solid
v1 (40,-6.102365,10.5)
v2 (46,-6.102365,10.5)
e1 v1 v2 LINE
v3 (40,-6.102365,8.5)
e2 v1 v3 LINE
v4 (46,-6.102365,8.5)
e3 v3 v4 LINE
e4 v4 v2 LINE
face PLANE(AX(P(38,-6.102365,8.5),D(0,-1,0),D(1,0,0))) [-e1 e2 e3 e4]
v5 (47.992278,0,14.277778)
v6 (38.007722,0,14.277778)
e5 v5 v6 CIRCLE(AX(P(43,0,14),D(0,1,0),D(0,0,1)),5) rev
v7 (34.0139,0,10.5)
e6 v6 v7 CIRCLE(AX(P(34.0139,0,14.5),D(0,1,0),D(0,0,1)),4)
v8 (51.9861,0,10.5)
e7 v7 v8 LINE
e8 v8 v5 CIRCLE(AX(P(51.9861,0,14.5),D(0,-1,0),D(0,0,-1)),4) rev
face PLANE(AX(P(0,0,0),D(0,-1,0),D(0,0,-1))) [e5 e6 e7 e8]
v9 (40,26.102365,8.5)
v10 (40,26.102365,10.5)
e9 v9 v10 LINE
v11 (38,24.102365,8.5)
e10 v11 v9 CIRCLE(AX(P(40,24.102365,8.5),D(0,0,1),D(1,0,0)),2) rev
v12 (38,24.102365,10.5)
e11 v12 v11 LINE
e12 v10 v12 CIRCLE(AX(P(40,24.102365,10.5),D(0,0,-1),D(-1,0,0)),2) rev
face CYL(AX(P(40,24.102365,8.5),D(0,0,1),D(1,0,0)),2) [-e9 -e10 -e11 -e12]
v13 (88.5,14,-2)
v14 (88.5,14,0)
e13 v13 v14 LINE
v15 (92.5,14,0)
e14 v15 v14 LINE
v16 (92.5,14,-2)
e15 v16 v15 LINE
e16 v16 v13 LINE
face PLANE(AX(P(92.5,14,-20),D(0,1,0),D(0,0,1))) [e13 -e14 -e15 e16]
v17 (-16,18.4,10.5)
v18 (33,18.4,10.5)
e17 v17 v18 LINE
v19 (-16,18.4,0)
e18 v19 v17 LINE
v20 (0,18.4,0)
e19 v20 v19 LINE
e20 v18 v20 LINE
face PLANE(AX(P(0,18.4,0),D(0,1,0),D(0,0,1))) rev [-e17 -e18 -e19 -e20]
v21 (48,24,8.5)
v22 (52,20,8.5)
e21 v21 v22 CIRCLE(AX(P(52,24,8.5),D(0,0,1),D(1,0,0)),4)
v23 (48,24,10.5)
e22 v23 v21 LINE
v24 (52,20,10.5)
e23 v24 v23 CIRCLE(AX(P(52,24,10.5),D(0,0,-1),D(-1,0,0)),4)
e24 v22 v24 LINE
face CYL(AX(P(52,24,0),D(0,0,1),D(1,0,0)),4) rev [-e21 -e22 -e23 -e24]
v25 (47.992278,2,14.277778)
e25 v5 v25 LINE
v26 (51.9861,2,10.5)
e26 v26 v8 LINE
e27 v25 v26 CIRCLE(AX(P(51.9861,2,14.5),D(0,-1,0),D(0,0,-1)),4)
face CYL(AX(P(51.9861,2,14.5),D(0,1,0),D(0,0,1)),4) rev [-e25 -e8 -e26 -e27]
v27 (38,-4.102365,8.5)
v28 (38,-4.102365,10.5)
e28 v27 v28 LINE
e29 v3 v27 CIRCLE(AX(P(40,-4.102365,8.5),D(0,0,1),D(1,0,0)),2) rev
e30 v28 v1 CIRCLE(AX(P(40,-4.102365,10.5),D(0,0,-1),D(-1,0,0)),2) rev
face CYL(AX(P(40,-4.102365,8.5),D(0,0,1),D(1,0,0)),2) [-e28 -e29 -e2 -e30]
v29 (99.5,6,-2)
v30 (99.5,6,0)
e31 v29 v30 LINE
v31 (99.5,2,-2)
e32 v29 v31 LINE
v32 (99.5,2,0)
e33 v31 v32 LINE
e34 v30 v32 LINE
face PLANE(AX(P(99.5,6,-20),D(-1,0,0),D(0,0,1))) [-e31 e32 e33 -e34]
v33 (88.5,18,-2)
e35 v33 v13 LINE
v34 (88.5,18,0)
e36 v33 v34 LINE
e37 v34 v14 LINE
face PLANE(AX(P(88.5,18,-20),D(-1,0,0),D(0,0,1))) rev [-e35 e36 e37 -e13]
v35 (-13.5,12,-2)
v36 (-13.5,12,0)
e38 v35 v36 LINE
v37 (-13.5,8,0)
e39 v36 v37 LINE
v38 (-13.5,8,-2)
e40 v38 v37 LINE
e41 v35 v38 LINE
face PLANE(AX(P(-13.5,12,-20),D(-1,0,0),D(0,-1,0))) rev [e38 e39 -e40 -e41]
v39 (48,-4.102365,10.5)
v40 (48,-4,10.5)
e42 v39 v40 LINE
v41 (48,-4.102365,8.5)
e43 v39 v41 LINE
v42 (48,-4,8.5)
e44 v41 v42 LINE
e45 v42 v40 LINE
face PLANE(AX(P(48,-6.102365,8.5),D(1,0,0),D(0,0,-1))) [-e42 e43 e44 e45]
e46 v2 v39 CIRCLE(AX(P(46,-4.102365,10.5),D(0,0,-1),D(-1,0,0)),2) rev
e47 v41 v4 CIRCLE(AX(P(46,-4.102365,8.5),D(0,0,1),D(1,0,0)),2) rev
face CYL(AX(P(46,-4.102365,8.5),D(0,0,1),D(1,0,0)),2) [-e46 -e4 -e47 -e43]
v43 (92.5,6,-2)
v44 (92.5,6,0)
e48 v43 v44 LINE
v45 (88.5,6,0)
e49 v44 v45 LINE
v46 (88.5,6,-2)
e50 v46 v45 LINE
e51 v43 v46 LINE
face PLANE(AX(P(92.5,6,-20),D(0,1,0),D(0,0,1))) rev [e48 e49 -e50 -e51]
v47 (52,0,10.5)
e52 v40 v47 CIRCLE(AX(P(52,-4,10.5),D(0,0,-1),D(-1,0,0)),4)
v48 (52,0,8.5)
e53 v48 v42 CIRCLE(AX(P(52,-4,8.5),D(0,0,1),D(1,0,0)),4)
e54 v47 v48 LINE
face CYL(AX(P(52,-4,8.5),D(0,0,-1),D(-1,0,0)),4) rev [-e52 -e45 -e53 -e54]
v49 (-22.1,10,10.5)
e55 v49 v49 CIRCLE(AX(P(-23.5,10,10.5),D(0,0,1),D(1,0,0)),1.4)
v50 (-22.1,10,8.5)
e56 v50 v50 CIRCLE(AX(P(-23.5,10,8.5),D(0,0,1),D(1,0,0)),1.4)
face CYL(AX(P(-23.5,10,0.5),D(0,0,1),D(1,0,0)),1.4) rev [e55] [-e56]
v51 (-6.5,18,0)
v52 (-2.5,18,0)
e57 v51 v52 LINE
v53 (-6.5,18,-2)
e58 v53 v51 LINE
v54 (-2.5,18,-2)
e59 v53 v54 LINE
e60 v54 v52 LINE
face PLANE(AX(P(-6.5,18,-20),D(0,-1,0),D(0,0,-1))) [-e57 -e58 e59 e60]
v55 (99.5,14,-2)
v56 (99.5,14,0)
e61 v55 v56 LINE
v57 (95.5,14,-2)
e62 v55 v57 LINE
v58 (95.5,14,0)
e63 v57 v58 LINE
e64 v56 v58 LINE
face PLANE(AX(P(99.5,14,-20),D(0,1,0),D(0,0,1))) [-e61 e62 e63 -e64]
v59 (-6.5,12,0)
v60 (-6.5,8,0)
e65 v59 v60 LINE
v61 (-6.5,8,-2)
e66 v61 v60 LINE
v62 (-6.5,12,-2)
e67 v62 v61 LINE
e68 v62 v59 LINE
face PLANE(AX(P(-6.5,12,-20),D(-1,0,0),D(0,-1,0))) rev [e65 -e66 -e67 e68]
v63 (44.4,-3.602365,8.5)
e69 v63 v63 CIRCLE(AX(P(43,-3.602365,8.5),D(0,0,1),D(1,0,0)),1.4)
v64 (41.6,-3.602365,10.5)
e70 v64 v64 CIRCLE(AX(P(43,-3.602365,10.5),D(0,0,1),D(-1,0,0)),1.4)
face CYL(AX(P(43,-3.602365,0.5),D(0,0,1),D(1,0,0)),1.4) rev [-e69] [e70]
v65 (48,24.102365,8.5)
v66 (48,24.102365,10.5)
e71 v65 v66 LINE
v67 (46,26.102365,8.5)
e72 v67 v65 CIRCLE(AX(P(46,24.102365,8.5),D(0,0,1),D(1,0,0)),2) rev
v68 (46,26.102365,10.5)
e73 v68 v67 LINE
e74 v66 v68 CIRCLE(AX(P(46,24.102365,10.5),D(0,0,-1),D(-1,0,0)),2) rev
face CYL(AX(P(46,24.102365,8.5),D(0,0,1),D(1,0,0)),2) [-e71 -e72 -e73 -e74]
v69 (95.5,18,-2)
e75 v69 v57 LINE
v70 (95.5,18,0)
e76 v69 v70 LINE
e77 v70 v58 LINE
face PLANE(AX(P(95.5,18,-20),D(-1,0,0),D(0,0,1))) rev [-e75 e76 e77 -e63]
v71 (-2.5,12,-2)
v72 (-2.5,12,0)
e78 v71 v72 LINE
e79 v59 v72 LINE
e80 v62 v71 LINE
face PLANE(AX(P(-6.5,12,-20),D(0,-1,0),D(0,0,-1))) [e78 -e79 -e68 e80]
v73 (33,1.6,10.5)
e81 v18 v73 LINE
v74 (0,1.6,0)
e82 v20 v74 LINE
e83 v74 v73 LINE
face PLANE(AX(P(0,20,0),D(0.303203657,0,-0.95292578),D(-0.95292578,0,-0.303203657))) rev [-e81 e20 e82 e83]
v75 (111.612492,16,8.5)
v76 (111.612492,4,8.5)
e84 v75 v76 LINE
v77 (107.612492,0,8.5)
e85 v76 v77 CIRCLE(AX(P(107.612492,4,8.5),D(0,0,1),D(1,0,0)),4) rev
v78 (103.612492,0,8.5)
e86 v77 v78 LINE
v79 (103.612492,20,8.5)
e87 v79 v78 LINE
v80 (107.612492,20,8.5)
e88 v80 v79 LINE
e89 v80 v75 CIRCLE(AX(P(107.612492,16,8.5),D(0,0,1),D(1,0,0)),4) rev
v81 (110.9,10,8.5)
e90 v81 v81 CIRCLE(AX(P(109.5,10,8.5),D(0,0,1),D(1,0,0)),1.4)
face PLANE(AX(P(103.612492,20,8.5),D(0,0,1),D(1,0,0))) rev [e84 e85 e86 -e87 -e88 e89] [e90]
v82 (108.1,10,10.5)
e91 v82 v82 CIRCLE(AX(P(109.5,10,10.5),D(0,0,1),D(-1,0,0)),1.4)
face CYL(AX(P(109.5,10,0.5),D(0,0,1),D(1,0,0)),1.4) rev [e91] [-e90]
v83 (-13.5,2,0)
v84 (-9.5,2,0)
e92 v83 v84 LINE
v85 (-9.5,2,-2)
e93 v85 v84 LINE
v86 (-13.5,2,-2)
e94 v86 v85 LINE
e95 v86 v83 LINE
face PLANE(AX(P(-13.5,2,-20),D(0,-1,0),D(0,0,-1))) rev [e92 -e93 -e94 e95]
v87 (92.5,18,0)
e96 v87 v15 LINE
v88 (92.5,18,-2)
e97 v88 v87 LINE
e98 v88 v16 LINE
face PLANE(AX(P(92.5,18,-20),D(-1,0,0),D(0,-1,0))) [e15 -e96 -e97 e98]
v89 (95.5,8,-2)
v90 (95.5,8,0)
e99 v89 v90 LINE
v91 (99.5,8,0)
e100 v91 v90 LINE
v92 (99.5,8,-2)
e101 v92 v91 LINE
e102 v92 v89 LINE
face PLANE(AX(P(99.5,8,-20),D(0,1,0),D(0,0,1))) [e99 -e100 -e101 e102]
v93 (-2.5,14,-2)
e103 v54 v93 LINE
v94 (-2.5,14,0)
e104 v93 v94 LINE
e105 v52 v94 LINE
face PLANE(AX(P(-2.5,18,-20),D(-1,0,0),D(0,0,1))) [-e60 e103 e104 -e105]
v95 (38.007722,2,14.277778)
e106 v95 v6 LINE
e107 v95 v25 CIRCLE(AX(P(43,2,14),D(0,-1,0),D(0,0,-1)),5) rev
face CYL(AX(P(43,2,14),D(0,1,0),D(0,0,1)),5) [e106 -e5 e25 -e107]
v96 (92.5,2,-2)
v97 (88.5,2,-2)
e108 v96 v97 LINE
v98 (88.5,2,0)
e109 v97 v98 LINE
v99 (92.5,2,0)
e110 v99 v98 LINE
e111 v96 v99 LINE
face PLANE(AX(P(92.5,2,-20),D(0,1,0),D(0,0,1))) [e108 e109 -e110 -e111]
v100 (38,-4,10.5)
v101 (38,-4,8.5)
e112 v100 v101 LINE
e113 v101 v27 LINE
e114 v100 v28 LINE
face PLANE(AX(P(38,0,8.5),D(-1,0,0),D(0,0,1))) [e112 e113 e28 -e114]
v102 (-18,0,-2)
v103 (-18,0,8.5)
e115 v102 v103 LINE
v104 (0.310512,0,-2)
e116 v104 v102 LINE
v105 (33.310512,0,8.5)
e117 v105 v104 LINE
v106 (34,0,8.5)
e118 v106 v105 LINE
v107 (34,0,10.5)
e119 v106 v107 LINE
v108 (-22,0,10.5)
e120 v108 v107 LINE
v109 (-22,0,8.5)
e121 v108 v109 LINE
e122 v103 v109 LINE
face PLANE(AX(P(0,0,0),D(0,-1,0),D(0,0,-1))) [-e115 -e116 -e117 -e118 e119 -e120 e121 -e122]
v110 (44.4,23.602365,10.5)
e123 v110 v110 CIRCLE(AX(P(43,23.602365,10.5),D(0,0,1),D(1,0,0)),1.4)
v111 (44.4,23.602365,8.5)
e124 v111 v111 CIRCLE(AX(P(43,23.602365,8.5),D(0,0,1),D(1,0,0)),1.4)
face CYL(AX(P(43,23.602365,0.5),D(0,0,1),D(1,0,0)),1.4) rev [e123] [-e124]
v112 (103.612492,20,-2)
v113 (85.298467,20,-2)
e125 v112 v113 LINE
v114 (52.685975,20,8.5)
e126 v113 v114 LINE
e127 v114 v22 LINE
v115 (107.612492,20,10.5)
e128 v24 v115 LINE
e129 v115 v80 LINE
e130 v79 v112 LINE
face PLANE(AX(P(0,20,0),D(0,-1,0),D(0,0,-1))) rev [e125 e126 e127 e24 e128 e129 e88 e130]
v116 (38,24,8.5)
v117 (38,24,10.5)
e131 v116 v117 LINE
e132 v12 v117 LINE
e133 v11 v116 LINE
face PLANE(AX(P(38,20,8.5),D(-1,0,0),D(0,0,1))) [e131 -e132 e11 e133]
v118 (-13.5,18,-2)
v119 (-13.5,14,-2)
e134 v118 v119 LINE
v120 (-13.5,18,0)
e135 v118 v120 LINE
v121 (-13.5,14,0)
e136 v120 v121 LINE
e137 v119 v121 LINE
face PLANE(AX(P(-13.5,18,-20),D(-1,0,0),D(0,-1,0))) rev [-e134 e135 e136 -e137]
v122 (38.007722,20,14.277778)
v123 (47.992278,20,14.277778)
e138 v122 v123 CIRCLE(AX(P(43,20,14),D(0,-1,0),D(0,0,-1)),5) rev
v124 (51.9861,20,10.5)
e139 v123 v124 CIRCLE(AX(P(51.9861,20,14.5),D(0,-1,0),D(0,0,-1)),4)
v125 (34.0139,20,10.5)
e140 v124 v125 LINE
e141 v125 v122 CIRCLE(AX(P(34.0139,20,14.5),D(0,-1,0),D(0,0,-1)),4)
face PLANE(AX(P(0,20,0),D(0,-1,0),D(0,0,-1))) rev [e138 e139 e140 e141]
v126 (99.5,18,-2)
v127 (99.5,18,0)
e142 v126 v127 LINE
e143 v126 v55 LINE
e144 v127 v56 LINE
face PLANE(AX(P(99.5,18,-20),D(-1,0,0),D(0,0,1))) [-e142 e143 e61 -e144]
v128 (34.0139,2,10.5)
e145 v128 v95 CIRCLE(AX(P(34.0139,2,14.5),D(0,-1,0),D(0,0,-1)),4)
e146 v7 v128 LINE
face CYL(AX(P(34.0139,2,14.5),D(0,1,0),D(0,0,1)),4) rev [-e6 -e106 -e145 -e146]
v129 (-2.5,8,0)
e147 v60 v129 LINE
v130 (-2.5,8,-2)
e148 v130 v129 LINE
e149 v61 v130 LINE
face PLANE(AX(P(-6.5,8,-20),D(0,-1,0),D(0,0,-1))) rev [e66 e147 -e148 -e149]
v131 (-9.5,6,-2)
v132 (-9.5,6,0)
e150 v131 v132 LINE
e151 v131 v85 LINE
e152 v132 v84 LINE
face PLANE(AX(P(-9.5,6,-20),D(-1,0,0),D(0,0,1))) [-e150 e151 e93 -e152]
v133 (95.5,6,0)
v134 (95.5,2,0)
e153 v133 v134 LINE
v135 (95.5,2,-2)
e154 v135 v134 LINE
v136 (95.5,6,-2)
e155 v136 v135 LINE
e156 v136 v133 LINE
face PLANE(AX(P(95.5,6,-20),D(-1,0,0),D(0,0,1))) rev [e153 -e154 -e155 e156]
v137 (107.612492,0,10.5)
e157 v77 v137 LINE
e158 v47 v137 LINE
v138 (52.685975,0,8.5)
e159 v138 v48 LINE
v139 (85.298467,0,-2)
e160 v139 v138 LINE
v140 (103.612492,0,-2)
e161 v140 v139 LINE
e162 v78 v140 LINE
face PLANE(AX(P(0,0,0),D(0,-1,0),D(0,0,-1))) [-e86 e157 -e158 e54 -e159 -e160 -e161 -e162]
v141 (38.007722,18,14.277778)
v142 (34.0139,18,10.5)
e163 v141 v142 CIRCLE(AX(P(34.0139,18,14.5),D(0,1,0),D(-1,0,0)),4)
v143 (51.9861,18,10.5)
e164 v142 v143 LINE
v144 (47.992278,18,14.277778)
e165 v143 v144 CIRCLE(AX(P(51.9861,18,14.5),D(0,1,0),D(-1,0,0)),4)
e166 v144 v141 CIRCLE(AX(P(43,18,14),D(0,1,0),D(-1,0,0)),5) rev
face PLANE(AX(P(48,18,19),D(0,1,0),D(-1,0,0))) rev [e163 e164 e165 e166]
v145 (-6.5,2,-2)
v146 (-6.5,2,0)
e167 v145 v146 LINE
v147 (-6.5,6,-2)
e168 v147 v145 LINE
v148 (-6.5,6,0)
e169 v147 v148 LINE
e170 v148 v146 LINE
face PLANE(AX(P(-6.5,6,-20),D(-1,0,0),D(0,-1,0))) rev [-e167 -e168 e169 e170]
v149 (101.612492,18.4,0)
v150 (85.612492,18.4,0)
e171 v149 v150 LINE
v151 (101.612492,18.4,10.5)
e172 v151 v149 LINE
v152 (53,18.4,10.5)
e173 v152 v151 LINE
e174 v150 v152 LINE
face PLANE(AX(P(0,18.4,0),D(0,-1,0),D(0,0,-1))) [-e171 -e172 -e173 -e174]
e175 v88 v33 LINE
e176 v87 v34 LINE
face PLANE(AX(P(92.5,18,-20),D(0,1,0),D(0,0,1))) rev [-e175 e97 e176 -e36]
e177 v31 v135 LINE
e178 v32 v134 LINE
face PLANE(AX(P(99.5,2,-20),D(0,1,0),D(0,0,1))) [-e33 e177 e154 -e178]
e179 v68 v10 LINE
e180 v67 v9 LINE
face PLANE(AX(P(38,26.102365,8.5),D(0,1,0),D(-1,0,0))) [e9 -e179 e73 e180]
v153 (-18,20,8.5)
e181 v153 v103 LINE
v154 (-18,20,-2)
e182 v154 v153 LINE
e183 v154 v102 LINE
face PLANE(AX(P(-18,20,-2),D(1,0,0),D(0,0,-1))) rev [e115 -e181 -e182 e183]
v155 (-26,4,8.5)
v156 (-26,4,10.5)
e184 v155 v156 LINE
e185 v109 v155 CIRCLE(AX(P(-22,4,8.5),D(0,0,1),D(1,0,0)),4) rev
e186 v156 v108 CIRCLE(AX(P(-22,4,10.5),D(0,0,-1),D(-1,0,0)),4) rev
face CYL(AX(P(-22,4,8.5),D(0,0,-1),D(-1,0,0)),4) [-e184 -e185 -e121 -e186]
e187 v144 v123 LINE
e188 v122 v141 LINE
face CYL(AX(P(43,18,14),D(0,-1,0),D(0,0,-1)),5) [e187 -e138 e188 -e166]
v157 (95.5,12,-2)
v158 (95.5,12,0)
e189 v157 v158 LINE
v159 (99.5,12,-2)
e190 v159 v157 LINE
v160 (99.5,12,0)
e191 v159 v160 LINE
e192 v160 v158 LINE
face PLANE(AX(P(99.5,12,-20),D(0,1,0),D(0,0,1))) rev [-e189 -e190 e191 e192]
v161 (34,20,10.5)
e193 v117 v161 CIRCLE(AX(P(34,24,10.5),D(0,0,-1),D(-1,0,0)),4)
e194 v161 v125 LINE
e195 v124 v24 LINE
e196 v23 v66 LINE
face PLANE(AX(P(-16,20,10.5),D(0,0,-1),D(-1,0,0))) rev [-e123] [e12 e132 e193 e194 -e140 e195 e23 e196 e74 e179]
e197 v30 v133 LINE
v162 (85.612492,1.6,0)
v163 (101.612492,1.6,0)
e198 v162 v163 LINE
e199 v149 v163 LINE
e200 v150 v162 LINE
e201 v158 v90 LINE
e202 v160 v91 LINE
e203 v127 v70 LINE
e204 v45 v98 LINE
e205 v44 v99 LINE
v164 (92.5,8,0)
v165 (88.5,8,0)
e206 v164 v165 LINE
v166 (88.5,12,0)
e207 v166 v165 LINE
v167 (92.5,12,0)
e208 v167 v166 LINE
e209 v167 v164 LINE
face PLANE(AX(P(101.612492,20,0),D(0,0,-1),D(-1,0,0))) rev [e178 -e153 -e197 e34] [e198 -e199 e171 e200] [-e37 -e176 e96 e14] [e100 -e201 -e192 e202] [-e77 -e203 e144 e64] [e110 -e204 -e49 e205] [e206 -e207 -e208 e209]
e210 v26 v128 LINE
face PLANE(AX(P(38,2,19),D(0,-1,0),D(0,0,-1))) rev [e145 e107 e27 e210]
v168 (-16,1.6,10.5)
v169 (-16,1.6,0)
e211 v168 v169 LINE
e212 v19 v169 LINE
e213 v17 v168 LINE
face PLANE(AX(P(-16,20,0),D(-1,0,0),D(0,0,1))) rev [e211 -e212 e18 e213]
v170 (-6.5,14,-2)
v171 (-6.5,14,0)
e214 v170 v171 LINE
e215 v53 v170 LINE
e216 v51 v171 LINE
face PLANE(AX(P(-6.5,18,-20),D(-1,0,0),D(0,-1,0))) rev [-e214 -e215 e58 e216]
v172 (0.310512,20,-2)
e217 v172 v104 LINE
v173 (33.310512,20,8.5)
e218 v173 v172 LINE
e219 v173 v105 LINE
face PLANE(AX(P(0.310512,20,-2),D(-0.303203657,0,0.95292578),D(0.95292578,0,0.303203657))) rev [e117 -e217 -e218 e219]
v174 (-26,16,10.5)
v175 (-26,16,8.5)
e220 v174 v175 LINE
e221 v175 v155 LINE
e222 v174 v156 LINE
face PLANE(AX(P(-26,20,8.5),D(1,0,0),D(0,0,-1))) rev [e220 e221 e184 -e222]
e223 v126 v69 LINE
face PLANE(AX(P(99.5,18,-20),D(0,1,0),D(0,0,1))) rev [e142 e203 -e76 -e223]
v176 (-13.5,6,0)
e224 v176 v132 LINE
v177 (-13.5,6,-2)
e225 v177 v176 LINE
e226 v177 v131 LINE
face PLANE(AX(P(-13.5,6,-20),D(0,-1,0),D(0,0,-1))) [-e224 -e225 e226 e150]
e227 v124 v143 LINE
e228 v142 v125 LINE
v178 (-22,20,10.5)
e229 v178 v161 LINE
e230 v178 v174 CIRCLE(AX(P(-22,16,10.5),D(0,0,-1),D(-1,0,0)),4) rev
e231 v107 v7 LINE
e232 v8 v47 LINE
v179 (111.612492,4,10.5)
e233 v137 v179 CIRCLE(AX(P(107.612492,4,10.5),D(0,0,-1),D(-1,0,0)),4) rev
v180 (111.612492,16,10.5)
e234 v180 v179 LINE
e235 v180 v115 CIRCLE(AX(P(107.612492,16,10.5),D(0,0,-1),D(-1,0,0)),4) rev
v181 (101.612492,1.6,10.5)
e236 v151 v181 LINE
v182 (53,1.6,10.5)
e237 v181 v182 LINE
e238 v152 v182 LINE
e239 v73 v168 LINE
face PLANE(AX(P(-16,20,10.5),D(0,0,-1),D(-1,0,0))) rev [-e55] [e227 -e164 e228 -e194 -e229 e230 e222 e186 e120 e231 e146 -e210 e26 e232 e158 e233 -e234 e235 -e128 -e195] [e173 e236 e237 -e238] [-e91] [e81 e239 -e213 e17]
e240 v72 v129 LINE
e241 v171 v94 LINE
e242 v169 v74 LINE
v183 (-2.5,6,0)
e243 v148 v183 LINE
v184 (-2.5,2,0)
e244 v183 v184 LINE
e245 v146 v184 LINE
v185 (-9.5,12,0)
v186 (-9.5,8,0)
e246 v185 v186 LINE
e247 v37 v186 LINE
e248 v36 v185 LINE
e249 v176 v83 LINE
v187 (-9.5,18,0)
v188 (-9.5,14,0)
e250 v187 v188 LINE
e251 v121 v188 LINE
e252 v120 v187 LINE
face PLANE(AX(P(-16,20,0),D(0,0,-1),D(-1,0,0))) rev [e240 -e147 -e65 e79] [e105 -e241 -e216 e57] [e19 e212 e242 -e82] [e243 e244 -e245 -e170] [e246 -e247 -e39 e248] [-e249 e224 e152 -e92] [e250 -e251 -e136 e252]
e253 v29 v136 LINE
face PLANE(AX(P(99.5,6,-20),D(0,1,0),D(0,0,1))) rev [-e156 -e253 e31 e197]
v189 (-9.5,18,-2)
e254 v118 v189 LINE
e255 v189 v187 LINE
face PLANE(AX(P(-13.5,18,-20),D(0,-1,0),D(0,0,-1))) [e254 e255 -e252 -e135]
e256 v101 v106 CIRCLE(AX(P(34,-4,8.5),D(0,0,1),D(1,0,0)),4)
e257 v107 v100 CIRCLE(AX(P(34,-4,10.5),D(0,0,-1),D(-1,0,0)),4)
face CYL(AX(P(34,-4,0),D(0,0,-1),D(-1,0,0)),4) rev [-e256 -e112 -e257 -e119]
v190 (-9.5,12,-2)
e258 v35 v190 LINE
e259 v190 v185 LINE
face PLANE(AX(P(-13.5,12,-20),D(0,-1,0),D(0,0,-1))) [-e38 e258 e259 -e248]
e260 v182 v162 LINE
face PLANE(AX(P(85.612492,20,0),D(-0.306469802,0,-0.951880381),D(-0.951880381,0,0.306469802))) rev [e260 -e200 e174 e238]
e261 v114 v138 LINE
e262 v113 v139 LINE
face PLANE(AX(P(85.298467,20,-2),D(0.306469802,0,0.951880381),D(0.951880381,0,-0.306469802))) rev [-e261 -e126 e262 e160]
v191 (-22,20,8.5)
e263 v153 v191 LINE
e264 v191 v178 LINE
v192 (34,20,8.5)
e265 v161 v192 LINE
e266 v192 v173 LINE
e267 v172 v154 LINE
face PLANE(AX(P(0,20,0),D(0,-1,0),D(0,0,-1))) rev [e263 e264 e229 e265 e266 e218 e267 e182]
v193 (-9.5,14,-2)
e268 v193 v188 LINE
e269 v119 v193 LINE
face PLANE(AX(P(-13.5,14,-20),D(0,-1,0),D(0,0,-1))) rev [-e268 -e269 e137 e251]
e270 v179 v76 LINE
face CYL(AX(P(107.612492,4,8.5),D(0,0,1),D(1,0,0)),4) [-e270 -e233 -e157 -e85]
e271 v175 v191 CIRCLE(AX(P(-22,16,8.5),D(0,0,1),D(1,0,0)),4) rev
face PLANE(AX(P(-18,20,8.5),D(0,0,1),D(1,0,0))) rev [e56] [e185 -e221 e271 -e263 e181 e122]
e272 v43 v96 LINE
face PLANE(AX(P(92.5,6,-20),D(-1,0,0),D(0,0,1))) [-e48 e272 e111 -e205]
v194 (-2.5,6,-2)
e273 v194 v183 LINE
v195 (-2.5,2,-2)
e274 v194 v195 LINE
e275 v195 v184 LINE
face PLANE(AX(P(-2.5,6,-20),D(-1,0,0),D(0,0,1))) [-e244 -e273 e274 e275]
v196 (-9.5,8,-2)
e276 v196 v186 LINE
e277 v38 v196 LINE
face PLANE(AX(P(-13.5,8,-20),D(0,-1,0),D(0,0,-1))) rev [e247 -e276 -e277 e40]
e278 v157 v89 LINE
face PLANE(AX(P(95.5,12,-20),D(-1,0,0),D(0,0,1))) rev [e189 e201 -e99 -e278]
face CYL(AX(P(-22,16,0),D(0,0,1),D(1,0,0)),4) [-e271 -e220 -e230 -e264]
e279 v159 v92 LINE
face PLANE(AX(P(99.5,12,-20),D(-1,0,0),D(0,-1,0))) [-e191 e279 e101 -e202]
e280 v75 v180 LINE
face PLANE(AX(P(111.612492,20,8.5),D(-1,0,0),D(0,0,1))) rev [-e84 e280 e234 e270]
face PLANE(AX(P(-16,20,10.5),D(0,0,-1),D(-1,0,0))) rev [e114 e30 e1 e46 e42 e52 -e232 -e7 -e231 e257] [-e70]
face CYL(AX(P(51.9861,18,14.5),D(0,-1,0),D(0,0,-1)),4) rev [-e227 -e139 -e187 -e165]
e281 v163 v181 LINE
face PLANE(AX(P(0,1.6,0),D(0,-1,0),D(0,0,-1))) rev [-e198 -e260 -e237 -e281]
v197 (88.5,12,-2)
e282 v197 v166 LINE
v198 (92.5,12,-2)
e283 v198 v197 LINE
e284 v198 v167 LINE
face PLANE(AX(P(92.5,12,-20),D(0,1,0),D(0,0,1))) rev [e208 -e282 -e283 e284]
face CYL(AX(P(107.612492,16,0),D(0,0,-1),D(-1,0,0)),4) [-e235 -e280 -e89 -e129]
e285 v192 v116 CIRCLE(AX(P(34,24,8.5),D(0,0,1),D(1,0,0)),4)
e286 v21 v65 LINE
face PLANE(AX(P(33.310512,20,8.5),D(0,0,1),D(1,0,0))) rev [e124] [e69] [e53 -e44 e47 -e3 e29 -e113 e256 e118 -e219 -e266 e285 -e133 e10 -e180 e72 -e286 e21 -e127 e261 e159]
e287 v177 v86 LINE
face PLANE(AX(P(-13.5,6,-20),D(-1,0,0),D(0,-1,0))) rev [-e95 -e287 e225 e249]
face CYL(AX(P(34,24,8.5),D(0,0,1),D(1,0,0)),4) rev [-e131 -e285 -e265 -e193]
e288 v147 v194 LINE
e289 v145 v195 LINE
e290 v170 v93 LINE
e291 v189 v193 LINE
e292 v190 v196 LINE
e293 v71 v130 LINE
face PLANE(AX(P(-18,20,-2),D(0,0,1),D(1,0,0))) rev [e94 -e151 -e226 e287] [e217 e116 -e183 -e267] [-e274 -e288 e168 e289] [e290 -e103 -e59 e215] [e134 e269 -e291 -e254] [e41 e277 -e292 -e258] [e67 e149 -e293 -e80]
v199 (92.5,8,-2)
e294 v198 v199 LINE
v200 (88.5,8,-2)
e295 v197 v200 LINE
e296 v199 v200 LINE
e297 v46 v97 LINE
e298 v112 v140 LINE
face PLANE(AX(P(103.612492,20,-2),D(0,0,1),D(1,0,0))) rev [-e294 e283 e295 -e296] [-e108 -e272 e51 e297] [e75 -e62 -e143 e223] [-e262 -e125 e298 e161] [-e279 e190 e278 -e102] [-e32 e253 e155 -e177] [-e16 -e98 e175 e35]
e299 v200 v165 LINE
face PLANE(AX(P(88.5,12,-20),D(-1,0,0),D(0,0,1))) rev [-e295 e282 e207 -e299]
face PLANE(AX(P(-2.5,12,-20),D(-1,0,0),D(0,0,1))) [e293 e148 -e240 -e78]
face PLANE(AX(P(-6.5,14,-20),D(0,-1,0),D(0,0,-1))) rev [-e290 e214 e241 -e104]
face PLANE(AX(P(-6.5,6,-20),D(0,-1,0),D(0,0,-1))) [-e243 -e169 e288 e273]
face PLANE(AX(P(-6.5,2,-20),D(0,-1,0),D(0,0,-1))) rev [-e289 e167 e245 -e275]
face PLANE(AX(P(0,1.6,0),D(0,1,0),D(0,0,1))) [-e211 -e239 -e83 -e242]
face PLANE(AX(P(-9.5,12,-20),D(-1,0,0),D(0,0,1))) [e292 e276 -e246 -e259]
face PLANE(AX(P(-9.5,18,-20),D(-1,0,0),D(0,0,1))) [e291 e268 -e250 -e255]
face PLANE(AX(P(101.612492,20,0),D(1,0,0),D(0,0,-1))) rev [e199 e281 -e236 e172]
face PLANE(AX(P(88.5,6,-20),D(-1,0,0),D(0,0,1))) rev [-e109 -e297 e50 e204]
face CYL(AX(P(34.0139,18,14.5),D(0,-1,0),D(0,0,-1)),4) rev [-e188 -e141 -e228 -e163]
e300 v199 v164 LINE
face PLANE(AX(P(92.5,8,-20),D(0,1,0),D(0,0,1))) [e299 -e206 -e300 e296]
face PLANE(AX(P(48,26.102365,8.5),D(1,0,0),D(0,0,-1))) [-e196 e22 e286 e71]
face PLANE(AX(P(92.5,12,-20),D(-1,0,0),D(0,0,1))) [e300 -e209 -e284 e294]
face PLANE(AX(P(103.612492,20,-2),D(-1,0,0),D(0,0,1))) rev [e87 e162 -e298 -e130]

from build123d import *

# Parameters (mm, degrees)
ESTRUSIONE_ESTRUSIONE1_DEPTH = 20
SCHIZZO2_W                   = 4
SCHIZZO2_H                   = 4
TAGLIO_ESTRUSIONE2_DEPTH     = 20
SCHIZZO3_W                   = 10
SCHIZZO3_H                   = 6.102364877
ESTRUSIONE_ESTRUSIONE3_DEPTH = 2
ESTRUSIONE_ESTRUSIONE4_DEPTH = 1.6
ESTRUSIONE_ESTRUSIONE5_DEPTH = 1.6
SCHIZZO15_W                  = 10
SCHIZZO15_H                  = 2
ESTRUSIONE_ESTRUSIONE6_DEPTH = 8.5
ESTRUSIONE_ESTRUSIONE7_DEPTH = 1.6
ESTRUSIONE_ESTRUSIONE8_DEPTH = 1.6
SCHIZZO24_W                  = 10
SCHIZZO24_H                  = 2
ESTRUSIONE_ESTRUSIONE9_DEPTH = 8.5
RACCORDO1_RADIUS             = 5
RACCORDO1_LENGTH             = 2
RACCORDO2_RADIUS             = 5
RACCORDO2_LENGTH             = 2
RACCORDO3_R                  = 4
RACCORDO4_R                  = 4
RACCORDO6_R                  = 2
SCHIZZO28_R                  = 1.4
TAGLIO_ESTRUSIONE5_DEPTH     = 10
SCHIZZO29_R                  = 1.4
TAGLIO_ESTRUSIONE6_DEPTH     = 10


with BuildPart() as part:
    # Schizzo1 → Estrusione-Estrusione1 (new body)
    with BuildSketch(Plane(origin=(0, 0, 0), x_dir=(1, 0, 0), z_dir=(0, 1, 0))):
        Polygon((-16, 0), (0, 0), (33, -10.5), (53, -10.5), (85.612492158, 0), (101.612492158, 0), (101.612492158, -10.5), (111.612492158, -10.5), (111.612492158, -8.5), (103.612492158, -8.5), (103.612492158, 2), (85.29846697, 2), (52.685974812, -8.5), (33.310512217, -8.5), (0.310512217, 2), (-18, 2), (-18, -8.5), (-26, -8.5), (-26, -10.5), (-16, -10.5), align=None)
    extrude(amount=ESTRUSIONE_ESTRUSIONE1_DEPTH)

    # Schizzo2 → Taglio-Estrusione2 (cut)
    with BuildSketch(Plane.XY):
        with Locations((-11.5, 16)):
            Rectangle(SCHIZZO2_W, SCHIZZO2_H)
        with Locations((-4.5, 16)):
            Rectangle(SCHIZZO2_W, SCHIZZO2_H)
        with Locations((-4.5, 10)):
            Rectangle(SCHIZZO2_W, SCHIZZO2_H)
        with Locations((-4.5, 4)):
            Rectangle(SCHIZZO2_W, SCHIZZO2_H)
        with Locations((-11.5, 10)):
            Rectangle(SCHIZZO2_W, SCHIZZO2_H)
        with Locations((-11.5, 4)):
            Rectangle(SCHIZZO2_W, SCHIZZO2_H)
        with Locations((97.5, 4)):
            Rectangle(SCHIZZO2_W, SCHIZZO2_H)
        with Locations((90.5, 4)):
            Rectangle(SCHIZZO2_W, SCHIZZO2_H)
        with Locations((90.5, 10)):
            Rectangle(SCHIZZO2_W, SCHIZZO2_H)
        with Locations((97.5, 10)):
            Rectangle(SCHIZZO2_W, SCHIZZO2_H)
        with Locations((90.5, 16)):
            Rectangle(SCHIZZO2_W, SCHIZZO2_H)
        with Locations((97.5, 16)):
            Rectangle(SCHIZZO2_W, SCHIZZO2_H)
    extrude(amount=-TAGLIO_ESTRUSIONE2_DEPTH, mode=Mode.SUBTRACT)

    # Schizzo3 → Estrusione-Estrusione3 (add)
    with BuildSketch(Plane.XY.offset(10.5)):
        with Locations((43, 23.051182438)):
            Rectangle(SCHIZZO3_W, SCHIZZO3_H)
        with Locations((43, -3.051182439)):
            Rectangle(SCHIZZO3_W, SCHIZZO3_H)
    extrude(amount=-ESTRUSIONE_ESTRUSIONE3_DEPTH)

    # Schizzo4 → Estrusione-Estrusione4 (add)
    with BuildSketch(Plane.XZ):
        Polygon((-16, 0), (-16, 10.5), (33, 10.5), (0, 0), align=None)
    extrude(amount=-ESTRUSIONE_ESTRUSIONE4_DEPTH)

    # Schizzo6 → Estrusione-Estrusione5 (add)
    with BuildSketch(Plane.XZ):
        Polygon((101.612492158, 10.5), (53, 10.5), (85.612492158, 0), (101.612492158, 0), align=None)
    extrude(amount=-ESTRUSIONE_ESTRUSIONE5_DEPTH)

    # Schizzo15 → Estrusione-Estrusione6 (add)
    with BuildSketch(Plane.XY.offset(10.5)):
        with Locations((43, 1)):
            Rectangle(SCHIZZO15_W, SCHIZZO15_H)
    extrude(amount=ESTRUSIONE_ESTRUSIONE6_DEPTH)

    # Schizzo20 → Estrusione-Estrusione7 (add)
    with BuildSketch(Plane(origin=(0, 20, 0), x_dir=(1, 0, 0), z_dir=(0, 1, 0))):
        Polygon((101.612492158, -10.5), (53, -10.5), (85.612492158, 0), (101.612492158, 0), align=None)
    extrude(amount=-ESTRUSIONE_ESTRUSIONE7_DEPTH)

    # Schizzo23 → Estrusione-Estrusione8 (add)
    with BuildSketch(Plane(origin=(0, 20, 0), x_dir=(1, 0, 0), z_dir=(0, 1, 0))):
        Polygon((-16, -10.5), (33, -10.5), (0, 0), (-16, 0), align=None)
    extrude(amount=-ESTRUSIONE_ESTRUSIONE8_DEPTH)

    # Schizzo24 → Estrusione-Estrusione9 (add)
    with BuildSketch(Plane.XY.offset(10.5)):
        with Locations((43, 19)):
            Rectangle(SCHIZZO24_W, SCHIZZO24_H)
    extrude(amount=ESTRUSIONE_ESTRUSIONE9_DEPTH)

    # Raccordo1: full round fillet: the end face becomes a half cylinder, R = half its width
    raccordo1_face = Plane((43, 19, 19), x_dir=(0, -1, 0), z_dir=(0, 0, 1))  # on the end face: x along it, z out of the body
    raccordo1_slab = raccordo1_face.offset(-RACCORDO1_RADIUS / 2) * Box(RACCORDO1_LENGTH, 2 * RACCORDO1_RADIUS, RACCORDO1_RADIUS, mode=Mode.PRIVATE)  # the body's end, R deep
    raccordo1_round = Plane((43, 19, 14), x_dir=(0, 0, 1), z_dir=(0, -1, 0)) * Cylinder(RACCORDO1_RADIUS, RACCORDO1_LENGTH, mode=Mode.PRIVATE)  # its axis R under the face
    add(raccordo1_slab - raccordo1_round, mode=Mode.SUBTRACT)

    # Raccordo2: full round fillet: the end face becomes a half cylinder, R = half its width
    raccordo2_face = Plane((43, 1, 19), x_dir=(0, 1, 0), z_dir=(0, 0, 1))  # on the end face: x along it, z out of the body
    raccordo2_slab = raccordo2_face.offset(-RACCORDO2_RADIUS / 2) * Box(RACCORDO2_LENGTH, 2 * RACCORDO2_RADIUS, RACCORDO2_RADIUS, mode=Mode.PRIVATE)  # the body's end, R deep
    raccordo2_round = Plane((43, 1, 14), x_dir=(0, 0, 1), z_dir=(0, 1, 0)) * Cylinder(RACCORDO2_RADIUS, RACCORDO2_LENGTH, mode=Mode.PRIVATE)  # its axis R under the face
    add(raccordo2_slab - raccordo2_round, mode=Mode.SUBTRACT)

    # Raccordo3
    # the kernel refuses this fillet: 4 mm, written as the material it adds along each edge
    with BuildSketch(Plane(origin=(48, 2, 10.5), x_dir=(1, 0, 0), z_dir=(0, -1, 0)), Plane(origin=(38, 0, 10.5), x_dir=(-1, 0, 0), z_dir=(0, 1, 0)), Plane(origin=(38, 18, 10.5), x_dir=(-1, 0, 0), z_dir=(0, 1, 0)), Plane(origin=(48, 20, 10.5), x_dir=(1, 0, 0), z_dir=(0, -1, 0))) as raccordo3_piece_1:
        with BuildLine():
            CenterArc((3.986100378, 4), RACCORDO3_R, 183.184738537, 86.815261463)
            Line((-0.007722012, 3.777777778), (-0.407104251, 3.755555556))
            ThreePointArc((-0.407104251, 3.755555556), (-0.4, 3.5), (-0.4, 0))
            Line((-0.4, 0), (0, -0.4))
            Line((0, -0.4), (3.986100378, -0.4))
            Line((3.986100378, -0.4), (3.986100378, 0))
        make_face()
    extrude(amount=2)
    # the kernel refuses this fillet: 4 mm, written as the material it takes off along each edge
    with BuildSketch(Plane(origin=(-26, 0, -1.5), x_dir=(0, 1, 0), z_dir=(0, 0, 1)), Plane(origin=(111.612492158, 0, 20.5), x_dir=(0, 1, 0), z_dir=(0, 0, -1))) as raccordo3_2_piece_1:
        with BuildLine():
            CenterArc((RACCORDO3_R, -RACCORDO3_R), RACCORDO3_R, 90, 90)
            Line((0, -RACCORDO3_R), (0, 0))
            Line((0, 0), (RACCORDO3_R, 0))
        make_face()
    extrude(amount=22, mode=Mode.SUBTRACT)
    with BuildSketch(Plane(origin=(111.612492158, 20, 20.5), x_dir=(0, -1, 0), z_dir=(0, 0, -1)), Plane(origin=(-26, 20, -1.5), x_dir=(0, -1, 0), z_dir=(0, 0, 1))) as raccordo3_2_piece_2:
        with BuildLine():
            CenterArc((RACCORDO3_R, RACCORDO3_R), RACCORDO3_R, 180, 90)
            Line((0, RACCORDO3_R), (0, 0))
            Line((0, 0), (RACCORDO3_R, 0))
        make_face()
    extrude(amount=22, mode=Mode.SUBTRACT)

    # Raccordo4
    # the kernel refuses this fillet: 4 mm, written as the material it adds along each edge
    with BuildSketch(Plane(origin=(48, 20, 8.5), x_dir=(1, 0, 0), z_dir=(0, 0, 1)), Plane(origin=(38, 20, 10.5), x_dir=(-1, 0, 0), z_dir=(0, 0, -1)), Plane(origin=(38, 0, 8.5), x_dir=(-1, 0, 0), z_dir=(0, 0, 1)), Plane(origin=(48, 0, 10.5), x_dir=(1, 0, 0), z_dir=(0, 0, -1))) as raccordo4_piece_1:
        with BuildLine():
            CenterArc((RACCORDO4_R, RACCORDO4_R), RACCORDO4_R, 180, 90)
            Line((0, RACCORDO4_R), (0, 0))
            Line((0, 0), (RACCORDO4_R, 0))
        make_face()
    extrude(amount=2)

    # Raccordo6
    raccordo6_edges = [part.edges().sort_by_distance(p)[0] for p in [
        (38, 26.102364877, 9.5),
        (48, 26.102364877, 9.5),
        (48, -6.102364877, 9.5),
        (38, -6.102364877, 9.5),
    ]]
    fillet(raccordo6_edges, radius=RACCORDO6_R)

    # Schizzo28 → Taglio-Estrusione5 (cut)
    with BuildSketch(Plane(origin=(42.230610684, 213.6, 10.5), x_dir=(1, 0, 0), z_dir=(0, 0, 1))):
        with Locations((0.769389316, -189.997635123)):
            Circle(SCHIZZO28_R)
        with Locations((0.769389316, -217.202364877)):
            Circle(SCHIZZO28_R)
    extrude(amount=-TAGLIO_ESTRUSIONE5_DEPTH, mode=Mode.SUBTRACT)

    # Schizzo29 → Taglio-Estrusione6 (cut)
    with BuildSketch(Plane(origin=(42.230610684, 213.6, 10.5), x_dir=(1, 0, 0), z_dir=(0, 0, 1))):
        with Locations((-65.730610684, -203.6)):
            Circle(SCHIZZO29_R)
        with Locations((67.269389316, -203.6)):
            Circle(SCHIZZO29_R)
    extrude(amount=-TAGLIO_ESTRUSIONE6_DEPTH, mode=Mode.SUBTRACT)


solid = part.part
